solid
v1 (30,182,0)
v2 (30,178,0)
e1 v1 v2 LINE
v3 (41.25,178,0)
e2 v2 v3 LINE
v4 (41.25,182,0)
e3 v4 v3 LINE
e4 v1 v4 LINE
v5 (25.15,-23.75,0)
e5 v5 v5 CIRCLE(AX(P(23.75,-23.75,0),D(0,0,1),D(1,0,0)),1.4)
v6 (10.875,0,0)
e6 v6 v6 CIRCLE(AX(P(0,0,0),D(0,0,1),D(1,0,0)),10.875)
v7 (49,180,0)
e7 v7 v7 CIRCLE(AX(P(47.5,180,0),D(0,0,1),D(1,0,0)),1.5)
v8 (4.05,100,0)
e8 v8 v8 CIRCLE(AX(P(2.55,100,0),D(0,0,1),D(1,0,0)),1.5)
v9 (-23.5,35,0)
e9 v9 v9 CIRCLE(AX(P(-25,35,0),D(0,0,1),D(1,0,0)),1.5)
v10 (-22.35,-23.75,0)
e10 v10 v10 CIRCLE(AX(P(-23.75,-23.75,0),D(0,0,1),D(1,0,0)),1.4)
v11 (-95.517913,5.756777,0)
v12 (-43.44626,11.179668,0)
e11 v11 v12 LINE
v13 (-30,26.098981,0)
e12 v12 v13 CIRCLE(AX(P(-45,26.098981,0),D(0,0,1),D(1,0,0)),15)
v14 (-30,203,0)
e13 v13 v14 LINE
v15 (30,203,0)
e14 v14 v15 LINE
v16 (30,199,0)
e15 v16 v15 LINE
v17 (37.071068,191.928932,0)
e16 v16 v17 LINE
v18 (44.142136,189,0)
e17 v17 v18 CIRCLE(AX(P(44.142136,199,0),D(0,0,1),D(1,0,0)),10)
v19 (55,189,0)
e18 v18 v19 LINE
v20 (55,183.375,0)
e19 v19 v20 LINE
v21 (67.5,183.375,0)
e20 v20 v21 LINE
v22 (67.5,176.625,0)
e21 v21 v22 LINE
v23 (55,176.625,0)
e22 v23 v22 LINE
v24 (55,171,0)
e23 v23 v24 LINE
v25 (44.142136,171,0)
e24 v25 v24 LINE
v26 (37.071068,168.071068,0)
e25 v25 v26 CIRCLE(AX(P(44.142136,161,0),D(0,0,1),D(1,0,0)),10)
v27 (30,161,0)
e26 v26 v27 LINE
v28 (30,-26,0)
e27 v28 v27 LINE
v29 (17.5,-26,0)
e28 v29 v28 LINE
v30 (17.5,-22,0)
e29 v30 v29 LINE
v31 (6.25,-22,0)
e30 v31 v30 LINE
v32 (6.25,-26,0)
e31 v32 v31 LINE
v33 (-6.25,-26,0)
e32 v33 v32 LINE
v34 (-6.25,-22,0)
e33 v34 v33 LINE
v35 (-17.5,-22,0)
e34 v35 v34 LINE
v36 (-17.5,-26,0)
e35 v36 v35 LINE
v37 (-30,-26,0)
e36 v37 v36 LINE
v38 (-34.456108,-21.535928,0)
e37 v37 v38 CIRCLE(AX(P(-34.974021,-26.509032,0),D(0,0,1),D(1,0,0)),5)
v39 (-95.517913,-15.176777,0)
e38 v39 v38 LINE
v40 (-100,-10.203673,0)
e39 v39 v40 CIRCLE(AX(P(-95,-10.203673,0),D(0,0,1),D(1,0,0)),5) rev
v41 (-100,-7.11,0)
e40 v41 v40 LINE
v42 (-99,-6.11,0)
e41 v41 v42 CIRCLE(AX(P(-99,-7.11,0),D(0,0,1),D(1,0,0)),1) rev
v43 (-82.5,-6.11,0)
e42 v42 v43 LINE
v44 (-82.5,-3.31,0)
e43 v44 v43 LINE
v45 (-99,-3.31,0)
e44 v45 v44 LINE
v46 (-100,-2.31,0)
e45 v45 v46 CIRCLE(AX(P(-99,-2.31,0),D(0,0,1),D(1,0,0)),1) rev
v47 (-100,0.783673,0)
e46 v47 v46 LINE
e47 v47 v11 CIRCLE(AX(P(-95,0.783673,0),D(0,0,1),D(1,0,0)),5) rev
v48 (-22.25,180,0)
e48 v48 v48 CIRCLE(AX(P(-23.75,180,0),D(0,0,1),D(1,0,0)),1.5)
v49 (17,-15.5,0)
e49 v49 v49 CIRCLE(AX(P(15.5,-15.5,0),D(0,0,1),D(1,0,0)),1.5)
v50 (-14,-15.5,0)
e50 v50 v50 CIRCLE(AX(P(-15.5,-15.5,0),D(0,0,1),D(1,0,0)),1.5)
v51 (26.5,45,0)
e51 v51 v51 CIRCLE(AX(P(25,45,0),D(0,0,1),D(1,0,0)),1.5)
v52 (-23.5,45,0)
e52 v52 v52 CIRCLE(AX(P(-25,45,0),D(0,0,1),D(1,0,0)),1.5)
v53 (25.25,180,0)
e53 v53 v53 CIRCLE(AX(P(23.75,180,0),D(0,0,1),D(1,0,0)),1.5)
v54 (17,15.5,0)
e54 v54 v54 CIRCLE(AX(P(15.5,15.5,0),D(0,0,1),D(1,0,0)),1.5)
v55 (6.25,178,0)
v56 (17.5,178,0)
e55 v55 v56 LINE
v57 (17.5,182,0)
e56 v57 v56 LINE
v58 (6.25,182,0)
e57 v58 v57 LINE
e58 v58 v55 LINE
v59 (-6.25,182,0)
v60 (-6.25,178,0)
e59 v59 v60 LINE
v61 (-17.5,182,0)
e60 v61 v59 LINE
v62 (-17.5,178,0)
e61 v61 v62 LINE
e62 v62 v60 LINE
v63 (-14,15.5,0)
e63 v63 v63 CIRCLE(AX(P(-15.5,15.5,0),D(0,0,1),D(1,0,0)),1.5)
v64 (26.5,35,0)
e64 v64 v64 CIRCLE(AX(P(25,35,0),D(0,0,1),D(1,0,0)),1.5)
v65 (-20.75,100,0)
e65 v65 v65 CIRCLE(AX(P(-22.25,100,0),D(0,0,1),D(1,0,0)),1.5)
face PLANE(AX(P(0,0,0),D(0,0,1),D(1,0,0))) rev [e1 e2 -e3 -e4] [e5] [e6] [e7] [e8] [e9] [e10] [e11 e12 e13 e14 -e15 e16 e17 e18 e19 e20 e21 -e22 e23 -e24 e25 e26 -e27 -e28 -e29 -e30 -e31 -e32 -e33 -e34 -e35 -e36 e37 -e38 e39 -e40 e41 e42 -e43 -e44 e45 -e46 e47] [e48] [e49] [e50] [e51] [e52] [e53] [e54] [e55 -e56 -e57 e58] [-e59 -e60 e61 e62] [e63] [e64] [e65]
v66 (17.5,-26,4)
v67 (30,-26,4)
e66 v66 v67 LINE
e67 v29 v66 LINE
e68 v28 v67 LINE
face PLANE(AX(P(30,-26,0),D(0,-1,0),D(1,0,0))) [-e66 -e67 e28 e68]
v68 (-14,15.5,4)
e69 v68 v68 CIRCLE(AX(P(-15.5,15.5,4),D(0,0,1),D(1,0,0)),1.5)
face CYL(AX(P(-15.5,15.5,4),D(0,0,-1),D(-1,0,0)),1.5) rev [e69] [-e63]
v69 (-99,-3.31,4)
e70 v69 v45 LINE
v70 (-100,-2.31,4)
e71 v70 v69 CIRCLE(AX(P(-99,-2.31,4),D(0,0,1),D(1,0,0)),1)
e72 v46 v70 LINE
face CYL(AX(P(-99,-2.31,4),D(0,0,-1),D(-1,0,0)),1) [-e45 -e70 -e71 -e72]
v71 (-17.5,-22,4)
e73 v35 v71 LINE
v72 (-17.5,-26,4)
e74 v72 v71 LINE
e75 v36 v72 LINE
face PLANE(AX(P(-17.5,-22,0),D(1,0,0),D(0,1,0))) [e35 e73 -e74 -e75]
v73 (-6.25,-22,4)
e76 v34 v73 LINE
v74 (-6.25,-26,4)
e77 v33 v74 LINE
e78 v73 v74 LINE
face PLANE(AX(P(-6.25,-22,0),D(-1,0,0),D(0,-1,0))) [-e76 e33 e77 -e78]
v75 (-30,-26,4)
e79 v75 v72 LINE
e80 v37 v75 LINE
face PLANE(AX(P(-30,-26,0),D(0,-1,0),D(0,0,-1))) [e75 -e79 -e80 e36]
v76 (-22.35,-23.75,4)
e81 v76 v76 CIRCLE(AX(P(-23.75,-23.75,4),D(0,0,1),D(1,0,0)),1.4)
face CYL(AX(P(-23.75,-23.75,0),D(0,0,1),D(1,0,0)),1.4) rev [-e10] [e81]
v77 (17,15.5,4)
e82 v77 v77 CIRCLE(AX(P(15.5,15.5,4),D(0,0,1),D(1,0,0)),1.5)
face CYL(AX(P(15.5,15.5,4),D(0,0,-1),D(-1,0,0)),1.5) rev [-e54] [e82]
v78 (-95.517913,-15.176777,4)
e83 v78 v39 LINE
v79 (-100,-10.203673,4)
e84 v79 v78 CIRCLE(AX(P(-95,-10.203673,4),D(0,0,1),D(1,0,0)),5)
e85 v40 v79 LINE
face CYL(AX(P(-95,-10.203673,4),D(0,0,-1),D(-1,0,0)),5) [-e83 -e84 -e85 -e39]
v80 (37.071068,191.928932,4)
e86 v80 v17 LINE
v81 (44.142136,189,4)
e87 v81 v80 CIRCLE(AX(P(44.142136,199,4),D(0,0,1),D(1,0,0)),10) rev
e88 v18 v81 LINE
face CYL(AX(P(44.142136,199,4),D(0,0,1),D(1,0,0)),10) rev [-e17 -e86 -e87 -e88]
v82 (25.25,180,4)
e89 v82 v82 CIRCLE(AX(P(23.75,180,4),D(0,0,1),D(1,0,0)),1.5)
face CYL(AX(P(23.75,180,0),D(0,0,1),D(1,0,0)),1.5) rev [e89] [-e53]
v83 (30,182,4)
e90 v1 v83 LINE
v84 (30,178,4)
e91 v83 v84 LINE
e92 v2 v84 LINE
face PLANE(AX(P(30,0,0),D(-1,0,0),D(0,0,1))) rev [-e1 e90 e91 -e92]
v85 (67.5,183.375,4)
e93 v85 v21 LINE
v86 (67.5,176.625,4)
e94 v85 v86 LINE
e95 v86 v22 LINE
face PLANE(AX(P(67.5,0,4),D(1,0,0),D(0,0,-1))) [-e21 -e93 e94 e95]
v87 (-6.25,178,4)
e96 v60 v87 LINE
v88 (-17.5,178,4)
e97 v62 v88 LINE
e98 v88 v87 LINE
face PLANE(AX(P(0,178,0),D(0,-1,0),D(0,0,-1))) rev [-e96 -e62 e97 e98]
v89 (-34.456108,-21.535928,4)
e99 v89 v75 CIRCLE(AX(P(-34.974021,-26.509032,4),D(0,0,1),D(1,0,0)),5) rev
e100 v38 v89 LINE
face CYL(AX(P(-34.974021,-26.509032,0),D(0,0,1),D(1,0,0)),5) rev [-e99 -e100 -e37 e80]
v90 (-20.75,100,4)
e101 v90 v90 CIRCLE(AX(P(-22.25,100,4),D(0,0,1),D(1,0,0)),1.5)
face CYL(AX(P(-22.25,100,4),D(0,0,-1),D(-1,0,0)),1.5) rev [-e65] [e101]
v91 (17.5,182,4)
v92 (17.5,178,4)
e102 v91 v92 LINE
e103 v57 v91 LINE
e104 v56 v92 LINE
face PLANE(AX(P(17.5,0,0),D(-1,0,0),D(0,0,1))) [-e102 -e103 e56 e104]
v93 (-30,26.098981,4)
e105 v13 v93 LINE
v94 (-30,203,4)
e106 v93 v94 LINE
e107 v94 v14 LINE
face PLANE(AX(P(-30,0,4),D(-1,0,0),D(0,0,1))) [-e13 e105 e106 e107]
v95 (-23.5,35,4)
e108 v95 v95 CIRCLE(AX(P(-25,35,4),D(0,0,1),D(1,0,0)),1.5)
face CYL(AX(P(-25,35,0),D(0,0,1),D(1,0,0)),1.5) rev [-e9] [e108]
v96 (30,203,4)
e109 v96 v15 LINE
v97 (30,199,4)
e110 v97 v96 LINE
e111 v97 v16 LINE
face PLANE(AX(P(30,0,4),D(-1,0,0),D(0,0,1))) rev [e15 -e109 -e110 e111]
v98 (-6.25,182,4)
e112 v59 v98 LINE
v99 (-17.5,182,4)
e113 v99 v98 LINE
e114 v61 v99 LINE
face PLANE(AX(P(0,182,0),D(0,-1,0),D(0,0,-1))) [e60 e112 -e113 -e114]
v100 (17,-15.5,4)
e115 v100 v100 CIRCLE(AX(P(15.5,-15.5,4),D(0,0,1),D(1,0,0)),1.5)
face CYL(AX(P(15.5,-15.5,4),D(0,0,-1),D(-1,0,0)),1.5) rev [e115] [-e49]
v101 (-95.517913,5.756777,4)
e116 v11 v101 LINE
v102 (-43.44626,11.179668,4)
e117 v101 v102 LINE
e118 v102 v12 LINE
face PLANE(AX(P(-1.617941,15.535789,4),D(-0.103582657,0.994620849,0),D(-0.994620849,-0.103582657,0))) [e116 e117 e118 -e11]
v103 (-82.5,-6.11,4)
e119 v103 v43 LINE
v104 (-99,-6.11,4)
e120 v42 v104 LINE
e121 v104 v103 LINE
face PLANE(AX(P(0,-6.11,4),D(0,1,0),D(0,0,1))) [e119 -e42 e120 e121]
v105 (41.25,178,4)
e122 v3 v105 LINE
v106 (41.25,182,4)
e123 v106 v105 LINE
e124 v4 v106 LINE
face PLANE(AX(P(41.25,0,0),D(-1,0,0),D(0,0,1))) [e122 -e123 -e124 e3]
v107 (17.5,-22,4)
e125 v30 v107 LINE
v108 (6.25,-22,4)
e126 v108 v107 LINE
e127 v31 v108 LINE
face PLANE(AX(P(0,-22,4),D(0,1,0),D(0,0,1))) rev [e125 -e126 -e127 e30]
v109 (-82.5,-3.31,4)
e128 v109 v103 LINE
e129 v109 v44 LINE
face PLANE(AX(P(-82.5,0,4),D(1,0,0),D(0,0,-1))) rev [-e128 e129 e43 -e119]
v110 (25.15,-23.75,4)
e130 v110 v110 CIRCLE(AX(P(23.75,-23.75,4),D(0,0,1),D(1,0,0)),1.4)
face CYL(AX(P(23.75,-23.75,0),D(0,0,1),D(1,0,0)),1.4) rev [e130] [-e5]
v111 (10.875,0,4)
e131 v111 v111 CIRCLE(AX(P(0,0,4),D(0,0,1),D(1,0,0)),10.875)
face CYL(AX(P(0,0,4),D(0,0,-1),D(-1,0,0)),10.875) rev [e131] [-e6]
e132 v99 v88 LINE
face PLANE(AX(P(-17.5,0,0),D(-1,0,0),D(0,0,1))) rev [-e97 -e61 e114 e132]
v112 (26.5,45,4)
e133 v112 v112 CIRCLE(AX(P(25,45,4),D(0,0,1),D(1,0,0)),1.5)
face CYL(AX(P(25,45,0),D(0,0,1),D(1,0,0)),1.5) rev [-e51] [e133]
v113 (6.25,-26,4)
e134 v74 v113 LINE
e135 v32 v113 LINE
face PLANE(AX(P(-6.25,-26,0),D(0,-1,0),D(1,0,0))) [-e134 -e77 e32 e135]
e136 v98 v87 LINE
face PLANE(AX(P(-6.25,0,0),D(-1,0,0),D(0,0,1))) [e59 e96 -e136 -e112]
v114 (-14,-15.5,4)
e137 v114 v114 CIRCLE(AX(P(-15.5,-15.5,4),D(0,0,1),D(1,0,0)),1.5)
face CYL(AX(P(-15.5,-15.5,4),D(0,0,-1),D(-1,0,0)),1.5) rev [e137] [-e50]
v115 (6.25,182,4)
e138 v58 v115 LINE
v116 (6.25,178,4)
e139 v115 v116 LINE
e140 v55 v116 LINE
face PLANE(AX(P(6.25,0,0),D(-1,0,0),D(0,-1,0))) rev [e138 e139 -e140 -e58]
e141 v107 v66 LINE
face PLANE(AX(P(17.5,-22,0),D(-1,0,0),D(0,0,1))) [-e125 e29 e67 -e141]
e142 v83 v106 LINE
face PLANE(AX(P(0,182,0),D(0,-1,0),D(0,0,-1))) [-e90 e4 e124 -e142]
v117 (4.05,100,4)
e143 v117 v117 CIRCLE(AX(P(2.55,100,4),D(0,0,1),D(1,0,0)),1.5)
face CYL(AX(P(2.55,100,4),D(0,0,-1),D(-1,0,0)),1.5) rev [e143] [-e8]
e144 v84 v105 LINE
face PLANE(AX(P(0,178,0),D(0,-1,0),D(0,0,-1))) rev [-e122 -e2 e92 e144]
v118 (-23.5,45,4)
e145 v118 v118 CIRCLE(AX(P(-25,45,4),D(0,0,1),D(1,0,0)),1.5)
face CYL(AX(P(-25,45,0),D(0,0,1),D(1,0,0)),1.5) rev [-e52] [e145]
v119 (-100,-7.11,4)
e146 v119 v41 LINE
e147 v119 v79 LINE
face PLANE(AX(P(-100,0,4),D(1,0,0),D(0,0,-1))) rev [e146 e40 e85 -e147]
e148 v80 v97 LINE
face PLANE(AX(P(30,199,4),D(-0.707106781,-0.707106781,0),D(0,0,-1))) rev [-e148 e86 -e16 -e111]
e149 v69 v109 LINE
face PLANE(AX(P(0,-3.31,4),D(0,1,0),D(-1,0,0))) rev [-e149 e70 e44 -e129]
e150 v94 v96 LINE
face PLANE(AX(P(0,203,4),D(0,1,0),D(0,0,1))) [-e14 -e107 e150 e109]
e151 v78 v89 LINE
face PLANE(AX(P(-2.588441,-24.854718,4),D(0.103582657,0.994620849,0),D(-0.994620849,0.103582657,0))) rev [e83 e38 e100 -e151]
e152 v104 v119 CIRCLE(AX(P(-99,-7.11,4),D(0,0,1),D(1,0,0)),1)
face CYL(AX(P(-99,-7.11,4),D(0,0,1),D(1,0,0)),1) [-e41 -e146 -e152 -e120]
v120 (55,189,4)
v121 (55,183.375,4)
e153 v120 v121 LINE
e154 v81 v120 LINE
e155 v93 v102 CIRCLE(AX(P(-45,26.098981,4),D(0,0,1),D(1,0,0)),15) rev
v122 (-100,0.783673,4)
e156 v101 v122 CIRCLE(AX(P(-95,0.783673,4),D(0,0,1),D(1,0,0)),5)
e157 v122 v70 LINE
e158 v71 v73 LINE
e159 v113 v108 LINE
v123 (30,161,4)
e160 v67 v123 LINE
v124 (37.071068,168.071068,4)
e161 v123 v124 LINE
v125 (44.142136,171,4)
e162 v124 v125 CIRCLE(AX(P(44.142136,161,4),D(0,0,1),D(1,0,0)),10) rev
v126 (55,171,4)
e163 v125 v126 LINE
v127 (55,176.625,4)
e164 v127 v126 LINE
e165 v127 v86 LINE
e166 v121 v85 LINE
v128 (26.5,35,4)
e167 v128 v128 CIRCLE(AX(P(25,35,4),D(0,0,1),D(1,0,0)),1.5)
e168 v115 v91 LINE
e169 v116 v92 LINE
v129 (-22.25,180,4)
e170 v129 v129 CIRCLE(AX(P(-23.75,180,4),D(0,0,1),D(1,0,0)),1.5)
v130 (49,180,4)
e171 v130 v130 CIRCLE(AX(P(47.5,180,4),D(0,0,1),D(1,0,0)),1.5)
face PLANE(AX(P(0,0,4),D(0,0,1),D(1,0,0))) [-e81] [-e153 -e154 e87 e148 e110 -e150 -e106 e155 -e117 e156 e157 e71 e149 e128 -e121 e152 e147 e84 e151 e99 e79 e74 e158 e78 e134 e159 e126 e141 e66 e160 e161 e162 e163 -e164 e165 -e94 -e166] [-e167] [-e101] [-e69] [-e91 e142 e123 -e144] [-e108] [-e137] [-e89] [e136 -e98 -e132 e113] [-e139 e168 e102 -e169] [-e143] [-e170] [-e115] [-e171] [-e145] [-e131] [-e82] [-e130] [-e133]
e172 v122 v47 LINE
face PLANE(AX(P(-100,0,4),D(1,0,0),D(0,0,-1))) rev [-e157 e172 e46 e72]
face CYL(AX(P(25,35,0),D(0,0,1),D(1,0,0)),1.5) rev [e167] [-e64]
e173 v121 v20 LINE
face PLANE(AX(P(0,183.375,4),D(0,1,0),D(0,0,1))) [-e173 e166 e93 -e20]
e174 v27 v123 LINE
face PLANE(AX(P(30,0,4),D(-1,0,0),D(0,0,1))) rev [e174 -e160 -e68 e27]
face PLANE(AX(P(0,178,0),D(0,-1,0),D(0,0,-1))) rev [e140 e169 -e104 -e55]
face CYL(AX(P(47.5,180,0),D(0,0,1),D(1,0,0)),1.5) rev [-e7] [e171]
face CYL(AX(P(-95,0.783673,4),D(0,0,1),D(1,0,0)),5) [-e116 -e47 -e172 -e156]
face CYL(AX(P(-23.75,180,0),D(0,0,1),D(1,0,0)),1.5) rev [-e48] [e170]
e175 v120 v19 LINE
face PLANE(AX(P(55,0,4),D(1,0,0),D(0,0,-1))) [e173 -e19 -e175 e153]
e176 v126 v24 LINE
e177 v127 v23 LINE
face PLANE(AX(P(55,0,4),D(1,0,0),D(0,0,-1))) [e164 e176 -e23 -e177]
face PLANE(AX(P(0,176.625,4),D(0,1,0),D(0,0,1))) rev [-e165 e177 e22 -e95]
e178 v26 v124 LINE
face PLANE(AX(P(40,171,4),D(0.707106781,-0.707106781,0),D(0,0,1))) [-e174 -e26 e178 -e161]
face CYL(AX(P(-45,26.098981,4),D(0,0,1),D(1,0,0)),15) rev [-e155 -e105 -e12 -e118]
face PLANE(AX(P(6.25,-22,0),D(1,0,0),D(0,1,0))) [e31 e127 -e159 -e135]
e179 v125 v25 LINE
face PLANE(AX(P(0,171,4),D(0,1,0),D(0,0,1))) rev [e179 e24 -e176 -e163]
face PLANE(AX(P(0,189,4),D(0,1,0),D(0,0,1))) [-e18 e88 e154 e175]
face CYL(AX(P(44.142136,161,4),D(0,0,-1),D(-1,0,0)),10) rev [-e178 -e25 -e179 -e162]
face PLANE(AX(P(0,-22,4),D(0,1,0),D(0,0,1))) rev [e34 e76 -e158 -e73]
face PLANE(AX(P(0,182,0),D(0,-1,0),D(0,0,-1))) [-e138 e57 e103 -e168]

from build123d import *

# Parameters (mm, degrees)
SKETCH_1_R          = 1.5
SKETCH_1_R_2        = 10.875
EXTRUDE_1_DEPTH     = 4
FILLET_3_R          = 15
FILLET_4_R          = 5
FILLET_5_R          = 1
SKETCH_2_W          = 12.5
SKETCH_2_H          = 4
SKETCH_2_R          = 1.4
EXTRUDE_2_DEPTH     = 4
FILLET_6_R          = 5
SKETCH_4_R          = 1.5
SKETCH_4_W          = 11.25
SKETCH_4_H          = 4
CUT_EXTRUDE_2_DEPTH = 227.329405955
CHAMFER_1_SIZE      = 10
FILLET_7_R          = 10
SKETCH_3_R          = 1.5
CUT_EXTRUDE_1_DEPTH = 227.329405955


with BuildPart() as part:
    # Эскиз1 → Бобышка-Вытянуть1 (new body)
    with BuildSketch(Plane.XY):
        Polygon((-100, -14.71), (-30, -22), (30, -22), (30, 171), (55, 171), (55, 176.625), (67.5, 176.625), (67.5, 183.375), (55, 183.375), (55, 189), (30, 189), (30, 203), (-30, 203), (-30, 12.58), (-100, 5.29), (-100, -3.31), (-82.5, -3.31), (-82.5, -6.11), (-100, -6.11), align=None)
        with Locations((-15.5, -15.5)):
            Circle(SKETCH_1_R, mode=Mode.SUBTRACT)
        Circle(SKETCH_1_R_2, mode=Mode.SUBTRACT)
        with Locations((15.5, -15.5)):
            Circle(SKETCH_1_R, mode=Mode.SUBTRACT)
        with Locations((-15.5, 15.5)):
            Circle(SKETCH_1_R, mode=Mode.SUBTRACT)
        with Locations((15.5, 15.5)):
            Circle(SKETCH_1_R, mode=Mode.SUBTRACT)
        with Locations((-22.25, 100)):
            Circle(SKETCH_1_R, mode=Mode.SUBTRACT)
        with Locations((2.55, 100)):
            Circle(SKETCH_1_R, mode=Mode.SUBTRACT)
    extrude(amount=EXTRUDE_1_DEPTH)

    # Скругление3
    fillet_3_edges = [part.edges().sort_by_distance(p)[0] for p in [
        (-30, 12.58, 2),
    ]]
    fillet(fillet_3_edges, radius=FILLET_3_R)

    # Скругление4
    fillet_4_edges = [part.edges().sort_by_distance(p)[0] for p in [
        (-100, -14.71, 2),
        (-100, 5.29, 2),
    ]]
    fillet(fillet_4_edges, radius=FILLET_4_R)

    # Скругление5
    fillet_5_edges = [part.edges().sort_by_distance(p)[0] for p in [
        (-100, -6.11, 2),
        (-100, -3.31, 2),
    ]]
    fillet(fillet_5_edges, radius=FILLET_5_R)

    # Эскиз2 → Бобышка-Вытянуть2 (add, through all)
    # profile 1 of 3: a face of its own
    with BuildSketch(Plane.XY.offset(4)):
        with Locations((-23.75, -24)):
            Rectangle(SKETCH_2_W, SKETCH_2_H)
        with Locations((-23.75, -23.75)):
            Circle(SKETCH_2_R, mode=Mode.SUBTRACT)
    # profile 2 of 3: a face of its own
    with BuildSketch(Plane.XY.offset(4)):
        with Locations((0, -24)):
            Rectangle(SKETCH_2_W, SKETCH_2_H)
    # profile 3 of 3: a face of its own
    with BuildSketch(Plane.XY.offset(4)):
        with Locations((23.75, -24)):
            Rectangle(SKETCH_2_W, SKETCH_2_H)
        with Locations((23.75, -23.75)):
            Circle(SKETCH_2_R, mode=Mode.SUBTRACT)
    extrude(amount=-EXTRUDE_2_DEPTH)

    # Скругление6
    # the kernel refuses this fillet: 5 mm, written as the material it adds along each edge
    with BuildSketch(Plane(origin=(-30, -22, 0), x_dir=(0, -1, 0), z_dir=(0, 0, 1))) as fillet_6_piece_1:
        with BuildLine():
            CenterArc((4.509032444, -4.974021107), FILLET_6_R, 95.843205651, 78.21128084)
            Line((-0.4640718, -4.456107822), (-0.563533885, -4.445749556))
            Line((-0.563533885, -4.445749556), (-0.099462085, 0.010358266))
            Line((-0.099462085, 0.010358266), (0, 0.1))
            ThreePointArc((0, 0.1), (2, 0.1), (3.989819351, 0.099480422))
            Line((3.989819351, 0.099480422), (4, 0))
        make_face()
    extrude(amount=4)

    # Эскиз4 → Вырез-Вытянуть2 (cut, through all)
    with BuildSketch(Plane.XY.offset(4)):
        with Locations((23.75, 180)):
            Circle(SKETCH_4_R)
        with Locations((-23.75, 180)):
            Circle(SKETCH_4_R)
        with Locations((-11.875, 180)):
            Rectangle(SKETCH_4_W, SKETCH_4_H)
        with Locations((11.875, 180)):
            Rectangle(SKETCH_4_W, SKETCH_4_H)
        with Locations((35.625, 180)):
            Rectangle(SKETCH_4_W, SKETCH_4_H)
        with Locations((47.5, 180)):
            Circle(SKETCH_4_R)
    extrude(amount=-CUT_EXTRUDE_2_DEPTH, mode=Mode.SUBTRACT)

    # Фаска1
    chamfer_1_edges = [part.edges().sort_by_distance(p)[0] for p in [
        (30, 171, 2),
        (30, 189, 2),
    ]]
    chamfer(chamfer_1_edges, length=CHAMFER_1_SIZE)

    # Скругление7
    fillet_7_edges = [part.edges().sort_by_distance(p)[0] for p in [
        (40, 171, 2),
        (40, 189, 2),
    ]]
    fillet(fillet_7_edges, radius=FILLET_7_R)

    # Эскиз3 → Вырез-Вытянуть1 (cut, through all)
    with BuildSketch(Plane.XY.offset(4)):
        with Locations((-25, 45)):
            Circle(SKETCH_3_R)
        with Locations((25, 45)):
            Circle(SKETCH_3_R)
        with Locations((-25, 35)):
            Circle(SKETCH_3_R)
        with Locations((25, 35)):
            Circle(SKETCH_3_R)
    extrude(amount=-CUT_EXTRUDE_1_DEPTH, mode=Mode.SUBTRACT)


solid = part.part
